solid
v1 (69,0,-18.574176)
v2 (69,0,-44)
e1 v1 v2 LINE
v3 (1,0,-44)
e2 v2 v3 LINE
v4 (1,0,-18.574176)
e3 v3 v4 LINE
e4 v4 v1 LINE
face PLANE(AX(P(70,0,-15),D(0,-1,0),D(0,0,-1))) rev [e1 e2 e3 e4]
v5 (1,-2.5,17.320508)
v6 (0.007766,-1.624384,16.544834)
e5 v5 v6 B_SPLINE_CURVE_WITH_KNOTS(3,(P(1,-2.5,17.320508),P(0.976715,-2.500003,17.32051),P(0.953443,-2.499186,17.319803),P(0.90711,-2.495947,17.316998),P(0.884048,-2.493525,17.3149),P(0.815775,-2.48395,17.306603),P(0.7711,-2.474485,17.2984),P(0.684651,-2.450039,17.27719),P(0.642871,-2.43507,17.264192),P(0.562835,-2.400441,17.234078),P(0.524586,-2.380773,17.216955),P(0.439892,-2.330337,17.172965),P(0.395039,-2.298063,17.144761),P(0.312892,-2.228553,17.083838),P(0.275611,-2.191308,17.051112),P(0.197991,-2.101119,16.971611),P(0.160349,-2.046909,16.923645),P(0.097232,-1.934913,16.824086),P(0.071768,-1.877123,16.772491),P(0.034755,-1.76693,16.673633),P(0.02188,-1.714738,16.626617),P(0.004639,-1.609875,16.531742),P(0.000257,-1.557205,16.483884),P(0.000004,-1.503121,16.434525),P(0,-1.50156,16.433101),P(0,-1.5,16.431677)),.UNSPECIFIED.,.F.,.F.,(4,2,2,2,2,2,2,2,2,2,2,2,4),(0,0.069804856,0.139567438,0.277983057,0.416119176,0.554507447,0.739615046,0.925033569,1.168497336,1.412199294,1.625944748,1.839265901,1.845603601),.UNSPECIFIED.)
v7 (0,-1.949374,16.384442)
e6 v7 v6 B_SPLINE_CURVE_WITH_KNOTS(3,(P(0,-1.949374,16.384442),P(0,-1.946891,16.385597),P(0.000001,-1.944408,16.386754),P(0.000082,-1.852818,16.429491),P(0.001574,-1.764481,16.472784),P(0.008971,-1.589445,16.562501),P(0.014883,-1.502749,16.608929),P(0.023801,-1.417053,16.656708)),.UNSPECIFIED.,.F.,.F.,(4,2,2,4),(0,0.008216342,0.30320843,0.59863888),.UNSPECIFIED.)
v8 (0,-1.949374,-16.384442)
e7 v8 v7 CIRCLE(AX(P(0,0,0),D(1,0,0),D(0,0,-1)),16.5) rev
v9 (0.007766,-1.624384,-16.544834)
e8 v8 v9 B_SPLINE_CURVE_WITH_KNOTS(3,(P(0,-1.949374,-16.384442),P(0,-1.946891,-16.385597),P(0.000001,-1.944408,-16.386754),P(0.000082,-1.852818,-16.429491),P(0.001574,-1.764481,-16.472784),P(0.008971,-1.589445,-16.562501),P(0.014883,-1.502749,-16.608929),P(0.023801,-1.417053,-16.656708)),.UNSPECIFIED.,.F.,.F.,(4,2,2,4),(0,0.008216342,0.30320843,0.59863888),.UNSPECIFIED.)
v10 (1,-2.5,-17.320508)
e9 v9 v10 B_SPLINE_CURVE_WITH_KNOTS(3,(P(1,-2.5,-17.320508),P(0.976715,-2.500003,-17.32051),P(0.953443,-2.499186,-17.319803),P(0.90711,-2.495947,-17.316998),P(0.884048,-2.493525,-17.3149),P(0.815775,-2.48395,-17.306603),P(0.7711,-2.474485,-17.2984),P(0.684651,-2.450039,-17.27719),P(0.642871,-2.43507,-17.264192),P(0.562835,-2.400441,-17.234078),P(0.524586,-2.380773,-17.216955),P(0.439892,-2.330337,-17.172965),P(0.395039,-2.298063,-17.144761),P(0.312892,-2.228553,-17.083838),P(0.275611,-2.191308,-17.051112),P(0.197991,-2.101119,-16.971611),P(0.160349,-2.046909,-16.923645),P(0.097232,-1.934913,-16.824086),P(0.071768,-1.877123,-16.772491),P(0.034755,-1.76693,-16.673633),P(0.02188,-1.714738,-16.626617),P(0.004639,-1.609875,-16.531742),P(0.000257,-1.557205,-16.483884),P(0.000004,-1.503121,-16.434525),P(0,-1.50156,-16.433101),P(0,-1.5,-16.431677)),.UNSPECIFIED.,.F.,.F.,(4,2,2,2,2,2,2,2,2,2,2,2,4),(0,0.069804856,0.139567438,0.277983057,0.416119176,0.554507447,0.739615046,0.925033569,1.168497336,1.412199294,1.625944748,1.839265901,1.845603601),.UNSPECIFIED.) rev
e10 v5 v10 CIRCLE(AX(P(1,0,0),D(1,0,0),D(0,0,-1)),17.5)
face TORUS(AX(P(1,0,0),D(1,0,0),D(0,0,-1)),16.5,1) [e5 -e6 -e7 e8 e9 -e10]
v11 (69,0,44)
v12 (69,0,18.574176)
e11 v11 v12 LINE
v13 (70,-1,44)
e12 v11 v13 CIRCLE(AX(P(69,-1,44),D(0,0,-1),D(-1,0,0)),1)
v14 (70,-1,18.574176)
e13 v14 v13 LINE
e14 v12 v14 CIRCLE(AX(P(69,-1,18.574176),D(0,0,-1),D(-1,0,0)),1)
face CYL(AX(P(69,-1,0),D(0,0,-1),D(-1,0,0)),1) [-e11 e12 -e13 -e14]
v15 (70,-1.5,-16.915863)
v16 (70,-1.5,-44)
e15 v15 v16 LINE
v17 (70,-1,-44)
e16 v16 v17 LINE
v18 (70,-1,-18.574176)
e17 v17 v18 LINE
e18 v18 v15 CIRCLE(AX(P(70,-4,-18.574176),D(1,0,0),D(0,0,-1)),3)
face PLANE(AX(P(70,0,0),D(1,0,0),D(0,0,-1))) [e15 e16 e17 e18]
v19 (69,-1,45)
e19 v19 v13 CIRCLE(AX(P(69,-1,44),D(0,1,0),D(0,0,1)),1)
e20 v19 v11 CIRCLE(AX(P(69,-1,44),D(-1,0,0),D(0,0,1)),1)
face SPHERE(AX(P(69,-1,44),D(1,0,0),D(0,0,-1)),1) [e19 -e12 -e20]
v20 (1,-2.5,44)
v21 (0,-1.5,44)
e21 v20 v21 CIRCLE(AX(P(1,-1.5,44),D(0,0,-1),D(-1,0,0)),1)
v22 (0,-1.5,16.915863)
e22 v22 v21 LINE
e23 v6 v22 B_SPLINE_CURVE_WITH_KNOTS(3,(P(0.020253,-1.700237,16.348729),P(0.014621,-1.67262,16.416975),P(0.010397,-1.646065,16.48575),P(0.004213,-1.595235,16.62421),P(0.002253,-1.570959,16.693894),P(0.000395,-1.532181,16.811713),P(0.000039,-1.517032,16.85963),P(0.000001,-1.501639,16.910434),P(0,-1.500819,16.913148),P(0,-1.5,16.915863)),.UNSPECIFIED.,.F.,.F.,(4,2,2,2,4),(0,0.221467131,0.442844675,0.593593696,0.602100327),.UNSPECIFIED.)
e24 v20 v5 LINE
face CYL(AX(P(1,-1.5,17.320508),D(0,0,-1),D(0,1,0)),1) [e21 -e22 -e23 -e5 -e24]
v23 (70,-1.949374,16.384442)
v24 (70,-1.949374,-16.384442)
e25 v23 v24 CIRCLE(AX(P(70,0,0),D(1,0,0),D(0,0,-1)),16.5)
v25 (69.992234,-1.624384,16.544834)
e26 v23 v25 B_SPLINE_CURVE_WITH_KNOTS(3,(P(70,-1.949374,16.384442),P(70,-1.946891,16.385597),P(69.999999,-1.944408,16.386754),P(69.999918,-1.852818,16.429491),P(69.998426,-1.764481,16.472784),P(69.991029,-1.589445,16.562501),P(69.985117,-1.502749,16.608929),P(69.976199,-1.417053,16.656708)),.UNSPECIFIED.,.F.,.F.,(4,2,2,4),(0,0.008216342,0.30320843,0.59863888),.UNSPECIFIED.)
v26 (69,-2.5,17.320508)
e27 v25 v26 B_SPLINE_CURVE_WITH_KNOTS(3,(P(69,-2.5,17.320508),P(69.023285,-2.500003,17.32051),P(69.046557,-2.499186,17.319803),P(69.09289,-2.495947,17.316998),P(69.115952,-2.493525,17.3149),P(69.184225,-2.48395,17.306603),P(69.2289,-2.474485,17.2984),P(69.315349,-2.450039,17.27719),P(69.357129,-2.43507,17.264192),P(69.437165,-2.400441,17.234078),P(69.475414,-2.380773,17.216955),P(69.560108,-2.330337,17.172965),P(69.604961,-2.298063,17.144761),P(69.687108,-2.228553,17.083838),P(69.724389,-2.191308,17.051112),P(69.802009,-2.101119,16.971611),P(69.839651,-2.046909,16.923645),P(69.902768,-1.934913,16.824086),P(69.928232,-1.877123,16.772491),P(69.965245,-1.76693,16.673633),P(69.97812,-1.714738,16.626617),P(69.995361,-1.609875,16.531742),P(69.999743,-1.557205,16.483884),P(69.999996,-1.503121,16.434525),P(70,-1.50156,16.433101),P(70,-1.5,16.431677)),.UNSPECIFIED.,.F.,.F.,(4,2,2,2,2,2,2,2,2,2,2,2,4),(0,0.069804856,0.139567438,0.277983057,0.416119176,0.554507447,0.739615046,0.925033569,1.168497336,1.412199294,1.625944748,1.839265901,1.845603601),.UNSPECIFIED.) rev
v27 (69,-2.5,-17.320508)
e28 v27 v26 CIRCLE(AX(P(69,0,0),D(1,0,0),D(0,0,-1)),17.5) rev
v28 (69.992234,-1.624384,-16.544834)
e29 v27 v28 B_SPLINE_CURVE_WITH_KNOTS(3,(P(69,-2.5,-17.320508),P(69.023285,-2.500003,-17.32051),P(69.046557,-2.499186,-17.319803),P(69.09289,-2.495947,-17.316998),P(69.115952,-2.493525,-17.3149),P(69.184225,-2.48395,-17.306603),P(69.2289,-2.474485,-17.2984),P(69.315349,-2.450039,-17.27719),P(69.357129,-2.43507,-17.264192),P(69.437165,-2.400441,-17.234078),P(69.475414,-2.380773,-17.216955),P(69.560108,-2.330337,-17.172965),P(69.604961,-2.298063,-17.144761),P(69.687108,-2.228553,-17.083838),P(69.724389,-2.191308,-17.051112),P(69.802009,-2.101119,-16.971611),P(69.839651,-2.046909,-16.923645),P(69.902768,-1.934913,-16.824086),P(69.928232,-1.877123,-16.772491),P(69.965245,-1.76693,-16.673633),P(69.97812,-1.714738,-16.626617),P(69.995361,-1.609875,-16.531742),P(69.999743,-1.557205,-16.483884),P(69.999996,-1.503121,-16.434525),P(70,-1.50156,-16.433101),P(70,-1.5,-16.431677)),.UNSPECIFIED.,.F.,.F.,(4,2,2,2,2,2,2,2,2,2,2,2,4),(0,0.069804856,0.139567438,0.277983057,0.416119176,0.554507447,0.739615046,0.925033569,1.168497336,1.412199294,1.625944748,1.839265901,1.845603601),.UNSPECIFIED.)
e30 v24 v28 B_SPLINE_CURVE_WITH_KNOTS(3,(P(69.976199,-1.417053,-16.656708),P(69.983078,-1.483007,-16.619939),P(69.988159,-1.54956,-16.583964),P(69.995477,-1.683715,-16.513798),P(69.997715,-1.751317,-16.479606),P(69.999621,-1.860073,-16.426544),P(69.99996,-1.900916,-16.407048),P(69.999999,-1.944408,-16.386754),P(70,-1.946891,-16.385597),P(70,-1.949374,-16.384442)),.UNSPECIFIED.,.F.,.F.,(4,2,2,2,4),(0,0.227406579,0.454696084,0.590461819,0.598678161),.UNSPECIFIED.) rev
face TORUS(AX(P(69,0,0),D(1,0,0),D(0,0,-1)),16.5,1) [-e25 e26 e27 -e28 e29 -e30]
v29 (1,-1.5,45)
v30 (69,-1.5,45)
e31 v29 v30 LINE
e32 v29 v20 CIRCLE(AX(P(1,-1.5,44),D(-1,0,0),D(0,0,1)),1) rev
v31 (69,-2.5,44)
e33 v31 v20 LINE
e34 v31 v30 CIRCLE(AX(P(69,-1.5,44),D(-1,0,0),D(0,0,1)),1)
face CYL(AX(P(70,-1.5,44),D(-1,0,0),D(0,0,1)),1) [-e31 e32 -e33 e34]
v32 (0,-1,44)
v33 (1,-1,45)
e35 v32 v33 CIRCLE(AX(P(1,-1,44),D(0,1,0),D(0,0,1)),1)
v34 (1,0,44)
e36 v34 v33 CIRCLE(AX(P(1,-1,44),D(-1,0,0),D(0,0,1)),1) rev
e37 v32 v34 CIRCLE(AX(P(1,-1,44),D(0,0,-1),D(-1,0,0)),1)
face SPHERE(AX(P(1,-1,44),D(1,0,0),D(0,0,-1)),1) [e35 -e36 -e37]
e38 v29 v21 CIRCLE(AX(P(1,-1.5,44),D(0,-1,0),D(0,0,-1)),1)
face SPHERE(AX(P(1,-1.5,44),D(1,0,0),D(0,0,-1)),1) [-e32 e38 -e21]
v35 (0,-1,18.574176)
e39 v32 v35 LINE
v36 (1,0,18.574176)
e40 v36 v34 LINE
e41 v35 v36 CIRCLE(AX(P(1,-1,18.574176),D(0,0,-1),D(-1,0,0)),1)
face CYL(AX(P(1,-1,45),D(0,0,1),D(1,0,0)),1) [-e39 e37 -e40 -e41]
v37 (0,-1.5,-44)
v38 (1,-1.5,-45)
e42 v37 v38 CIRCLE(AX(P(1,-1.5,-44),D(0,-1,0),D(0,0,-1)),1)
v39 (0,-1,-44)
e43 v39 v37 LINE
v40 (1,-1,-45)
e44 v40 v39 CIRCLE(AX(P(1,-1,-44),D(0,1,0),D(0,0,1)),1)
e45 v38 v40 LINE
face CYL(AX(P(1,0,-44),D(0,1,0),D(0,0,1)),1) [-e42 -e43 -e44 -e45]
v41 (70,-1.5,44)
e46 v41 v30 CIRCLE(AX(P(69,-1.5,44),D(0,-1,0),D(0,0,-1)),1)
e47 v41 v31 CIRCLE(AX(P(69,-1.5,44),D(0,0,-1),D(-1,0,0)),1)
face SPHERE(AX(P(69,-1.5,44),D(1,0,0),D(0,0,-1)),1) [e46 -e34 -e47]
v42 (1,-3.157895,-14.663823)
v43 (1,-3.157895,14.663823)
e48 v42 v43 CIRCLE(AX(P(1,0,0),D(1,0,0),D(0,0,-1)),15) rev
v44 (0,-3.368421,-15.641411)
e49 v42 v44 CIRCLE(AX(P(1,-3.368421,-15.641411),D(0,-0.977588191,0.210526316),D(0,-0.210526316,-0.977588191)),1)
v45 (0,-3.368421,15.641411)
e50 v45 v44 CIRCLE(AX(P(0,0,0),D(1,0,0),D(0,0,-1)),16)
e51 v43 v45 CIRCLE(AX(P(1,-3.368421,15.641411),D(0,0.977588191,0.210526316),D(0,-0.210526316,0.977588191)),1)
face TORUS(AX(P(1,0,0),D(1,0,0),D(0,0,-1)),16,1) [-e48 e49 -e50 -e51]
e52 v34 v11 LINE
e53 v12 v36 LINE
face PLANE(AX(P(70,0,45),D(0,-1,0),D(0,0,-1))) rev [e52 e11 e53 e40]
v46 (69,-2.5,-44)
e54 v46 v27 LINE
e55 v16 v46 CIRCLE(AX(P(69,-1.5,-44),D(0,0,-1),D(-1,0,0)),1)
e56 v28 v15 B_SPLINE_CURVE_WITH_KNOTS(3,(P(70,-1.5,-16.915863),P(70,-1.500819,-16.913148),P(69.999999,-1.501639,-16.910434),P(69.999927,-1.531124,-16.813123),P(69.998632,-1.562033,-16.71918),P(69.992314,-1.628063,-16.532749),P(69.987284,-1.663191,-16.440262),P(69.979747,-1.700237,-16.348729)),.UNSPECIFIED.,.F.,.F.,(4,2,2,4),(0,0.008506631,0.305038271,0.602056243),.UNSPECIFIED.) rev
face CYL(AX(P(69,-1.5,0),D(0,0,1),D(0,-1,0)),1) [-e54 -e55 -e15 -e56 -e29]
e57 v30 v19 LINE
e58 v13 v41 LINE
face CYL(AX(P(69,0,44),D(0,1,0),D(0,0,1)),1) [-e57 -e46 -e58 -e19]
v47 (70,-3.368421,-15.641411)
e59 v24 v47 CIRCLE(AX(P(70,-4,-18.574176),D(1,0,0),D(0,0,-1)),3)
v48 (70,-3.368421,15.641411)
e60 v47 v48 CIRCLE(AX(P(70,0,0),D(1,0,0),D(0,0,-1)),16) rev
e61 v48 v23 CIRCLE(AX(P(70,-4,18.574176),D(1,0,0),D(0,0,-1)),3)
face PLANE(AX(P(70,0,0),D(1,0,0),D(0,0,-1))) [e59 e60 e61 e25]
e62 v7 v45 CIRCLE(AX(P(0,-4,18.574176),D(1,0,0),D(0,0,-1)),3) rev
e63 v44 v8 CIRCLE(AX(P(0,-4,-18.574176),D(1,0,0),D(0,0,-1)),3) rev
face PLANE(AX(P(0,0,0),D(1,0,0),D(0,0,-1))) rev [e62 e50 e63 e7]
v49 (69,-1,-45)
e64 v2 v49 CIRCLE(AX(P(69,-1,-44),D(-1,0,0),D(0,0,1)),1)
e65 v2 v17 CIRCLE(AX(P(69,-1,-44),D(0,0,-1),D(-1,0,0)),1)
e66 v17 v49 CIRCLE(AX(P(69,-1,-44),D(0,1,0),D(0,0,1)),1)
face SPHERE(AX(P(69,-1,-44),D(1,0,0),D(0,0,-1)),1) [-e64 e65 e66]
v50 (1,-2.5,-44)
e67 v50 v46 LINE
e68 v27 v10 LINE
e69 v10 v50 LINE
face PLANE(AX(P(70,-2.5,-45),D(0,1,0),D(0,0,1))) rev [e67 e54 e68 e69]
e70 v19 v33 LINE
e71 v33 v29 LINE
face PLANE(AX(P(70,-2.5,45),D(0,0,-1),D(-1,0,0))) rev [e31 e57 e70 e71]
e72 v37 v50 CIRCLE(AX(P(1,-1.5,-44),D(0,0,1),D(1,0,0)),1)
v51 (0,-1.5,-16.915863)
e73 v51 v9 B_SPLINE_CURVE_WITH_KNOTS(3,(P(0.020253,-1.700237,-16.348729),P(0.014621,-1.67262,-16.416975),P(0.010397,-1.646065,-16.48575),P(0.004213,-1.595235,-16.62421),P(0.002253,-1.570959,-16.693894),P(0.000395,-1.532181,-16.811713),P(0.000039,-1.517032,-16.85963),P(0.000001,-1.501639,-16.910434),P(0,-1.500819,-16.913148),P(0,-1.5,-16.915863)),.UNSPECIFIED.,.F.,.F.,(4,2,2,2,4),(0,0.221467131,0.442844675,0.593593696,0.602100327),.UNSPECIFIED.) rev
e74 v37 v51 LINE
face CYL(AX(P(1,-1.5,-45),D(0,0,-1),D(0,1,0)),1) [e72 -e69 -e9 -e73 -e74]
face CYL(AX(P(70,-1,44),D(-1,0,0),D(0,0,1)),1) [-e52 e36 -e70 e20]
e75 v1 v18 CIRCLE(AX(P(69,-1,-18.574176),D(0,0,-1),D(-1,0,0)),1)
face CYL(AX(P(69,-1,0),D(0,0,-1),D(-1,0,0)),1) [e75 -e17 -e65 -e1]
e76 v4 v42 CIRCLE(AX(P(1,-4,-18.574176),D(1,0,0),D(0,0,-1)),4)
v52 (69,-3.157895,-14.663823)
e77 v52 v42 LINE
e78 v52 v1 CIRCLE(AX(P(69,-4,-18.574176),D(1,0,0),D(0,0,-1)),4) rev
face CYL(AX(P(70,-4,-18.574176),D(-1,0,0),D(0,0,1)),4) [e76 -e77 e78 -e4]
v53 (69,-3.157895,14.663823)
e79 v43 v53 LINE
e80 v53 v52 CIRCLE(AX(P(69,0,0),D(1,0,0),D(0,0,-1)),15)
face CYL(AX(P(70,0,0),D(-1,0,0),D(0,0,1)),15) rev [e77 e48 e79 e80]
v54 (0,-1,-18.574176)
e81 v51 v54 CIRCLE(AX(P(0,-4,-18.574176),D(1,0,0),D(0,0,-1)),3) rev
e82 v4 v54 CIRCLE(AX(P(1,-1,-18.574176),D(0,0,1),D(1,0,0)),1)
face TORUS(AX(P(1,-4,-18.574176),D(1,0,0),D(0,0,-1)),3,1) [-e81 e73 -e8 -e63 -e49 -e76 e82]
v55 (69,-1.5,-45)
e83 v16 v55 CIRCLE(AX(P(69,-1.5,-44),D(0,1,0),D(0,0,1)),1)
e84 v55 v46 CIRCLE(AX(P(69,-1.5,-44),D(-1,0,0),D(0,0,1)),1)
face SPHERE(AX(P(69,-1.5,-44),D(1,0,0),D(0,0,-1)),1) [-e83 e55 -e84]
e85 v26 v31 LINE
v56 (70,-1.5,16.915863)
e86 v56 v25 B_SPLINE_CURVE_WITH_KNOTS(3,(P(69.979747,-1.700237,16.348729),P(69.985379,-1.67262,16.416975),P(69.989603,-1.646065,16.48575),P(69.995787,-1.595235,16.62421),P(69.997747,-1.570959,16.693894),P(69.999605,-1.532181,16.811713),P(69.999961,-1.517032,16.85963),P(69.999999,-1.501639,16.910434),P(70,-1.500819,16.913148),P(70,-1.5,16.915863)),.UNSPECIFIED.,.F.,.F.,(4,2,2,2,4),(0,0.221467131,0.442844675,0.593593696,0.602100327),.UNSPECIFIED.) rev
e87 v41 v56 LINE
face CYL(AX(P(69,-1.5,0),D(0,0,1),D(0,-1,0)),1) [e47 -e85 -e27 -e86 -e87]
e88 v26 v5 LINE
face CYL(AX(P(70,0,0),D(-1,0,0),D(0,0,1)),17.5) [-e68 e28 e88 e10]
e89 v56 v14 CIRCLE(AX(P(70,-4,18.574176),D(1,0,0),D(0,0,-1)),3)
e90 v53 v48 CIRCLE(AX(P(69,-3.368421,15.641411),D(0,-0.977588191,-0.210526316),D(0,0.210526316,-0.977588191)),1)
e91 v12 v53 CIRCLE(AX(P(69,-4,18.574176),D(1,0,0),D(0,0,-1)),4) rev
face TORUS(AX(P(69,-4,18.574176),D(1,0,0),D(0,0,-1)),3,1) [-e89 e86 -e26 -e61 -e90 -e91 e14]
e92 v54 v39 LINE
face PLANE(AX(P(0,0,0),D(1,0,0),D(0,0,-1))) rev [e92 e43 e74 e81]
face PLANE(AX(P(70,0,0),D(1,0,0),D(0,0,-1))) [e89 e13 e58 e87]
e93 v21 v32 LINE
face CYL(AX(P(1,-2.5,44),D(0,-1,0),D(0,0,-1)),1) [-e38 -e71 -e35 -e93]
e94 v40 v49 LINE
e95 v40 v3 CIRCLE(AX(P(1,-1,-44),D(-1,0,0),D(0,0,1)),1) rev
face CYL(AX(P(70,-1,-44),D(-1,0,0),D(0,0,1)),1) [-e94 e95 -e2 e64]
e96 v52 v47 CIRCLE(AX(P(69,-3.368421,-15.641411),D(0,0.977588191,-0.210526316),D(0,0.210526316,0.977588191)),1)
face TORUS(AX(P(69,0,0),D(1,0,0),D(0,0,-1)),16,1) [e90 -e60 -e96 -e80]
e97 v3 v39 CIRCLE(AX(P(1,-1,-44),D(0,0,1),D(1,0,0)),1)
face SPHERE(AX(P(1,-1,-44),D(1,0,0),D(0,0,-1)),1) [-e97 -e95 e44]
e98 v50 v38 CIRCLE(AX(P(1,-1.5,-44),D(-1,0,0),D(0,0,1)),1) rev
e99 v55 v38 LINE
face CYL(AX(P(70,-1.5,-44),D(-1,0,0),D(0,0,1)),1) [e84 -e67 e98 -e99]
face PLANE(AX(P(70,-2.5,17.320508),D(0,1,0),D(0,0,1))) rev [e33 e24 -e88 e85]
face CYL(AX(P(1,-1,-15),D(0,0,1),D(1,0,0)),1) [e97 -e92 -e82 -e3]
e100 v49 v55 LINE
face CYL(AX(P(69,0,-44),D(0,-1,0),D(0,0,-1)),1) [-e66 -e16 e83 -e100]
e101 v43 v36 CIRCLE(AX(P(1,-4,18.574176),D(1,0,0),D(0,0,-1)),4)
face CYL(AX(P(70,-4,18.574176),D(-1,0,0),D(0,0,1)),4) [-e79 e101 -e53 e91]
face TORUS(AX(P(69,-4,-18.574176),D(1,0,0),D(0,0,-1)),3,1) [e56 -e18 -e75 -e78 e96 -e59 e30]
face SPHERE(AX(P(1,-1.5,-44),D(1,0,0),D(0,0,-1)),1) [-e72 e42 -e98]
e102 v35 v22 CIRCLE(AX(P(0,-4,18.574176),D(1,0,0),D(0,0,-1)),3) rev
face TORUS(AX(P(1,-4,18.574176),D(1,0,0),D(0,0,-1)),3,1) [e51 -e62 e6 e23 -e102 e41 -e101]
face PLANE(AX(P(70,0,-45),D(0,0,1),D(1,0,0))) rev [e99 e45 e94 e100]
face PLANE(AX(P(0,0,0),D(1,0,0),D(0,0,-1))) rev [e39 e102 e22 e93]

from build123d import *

# Parameters (mm, degrees)
BOSS_EXTRUDE1_DEPTH = 70
FILLET1_R           = 1
FILLET2_R           = 4
FILLET3_R           = 1


with BuildPart() as part:
    # Sketch1 → Boss-Extrude1 (new body)
    with BuildSketch(Plane(origin=(0, 0, 0), x_dir=(0, 0, -1), z_dir=(1, 0, 0))):
        with BuildLine():
            Line((-45, 0), (-15, 0))
            ThreePointArc((-15, 0), (0, -15), (15, 0))
            Line((15, 0), (45, 0))
            Line((45, 0), (45, -2.5))
            Line((45, -2.5), (17.320508076, -2.5))
            ThreePointArc((17.320508076, -2.5), (0, -17.5), (-17.320508076, -2.5))
            Line((-17.320508076, -2.5), (-45, -2.5))
            Line((-45, -2.5), (-45, 0))
        make_face()
    extrude(amount=BOSS_EXTRUDE1_DEPTH)

    # Fillet1
    fillet1_edges = [part.edges().sort_by_distance(p)[0] for p in [
        (35, 0, -45),
        (35, -2.5, -45),
        (35, -2.5, 45),
        (35, 0, 45),
    ]]
    fillet(fillet1_edges, radius=FILLET1_R)

    # Fillet2
    fillet2_edges = [part.edges().sort_by_distance(p)[0] for p in [
        (35, 0, -15),
        (35, 0, 15),
    ]]
    fillet(fillet2_edges, radius=FILLET2_R)

    # Fillet3
    # the kernel refuses this fillet: 1 mm, written as the material it takes off along each edge
    with BuildSketch(Plane(origin=(70, 0, 0), x_dir=(0, -0.0003007400627751114, -0.9999999547777063), z_dir=(0, 0.9999999547777063, -0.0003007400627751114))) as fillet3_piece_1_section:
        with BuildLine():
            CenterArc((17.5 - FILLET3_R, FILLET3_R), FILLET3_R, 270, 90)
            Line((17.5 - FILLET3_R, 0), (17.5, 0))
            Line((17.5, 0), (17.5, FILLET3_R))
        make_face()
    fillet3_piece_1 = revolve(axis=Axis((70, 0, 0), (-1, 0, 0)), revolution_arc=179.965537727, mode=Mode.PRIVATE)
    fillet3_piece_1 = split(fillet3_piece_1, bisect_by=Plane(origin=(70, -2.5, 0), z_dir=(0, -1, 0)), keep=Keep.TOP, mode=Mode.PRIVATE)
    add(fillet3_piece_1, mode=Mode.SUBTRACT)
    with BuildSketch(Plane(origin=(70, -2.5, -44), x_dir=(-1, 0, 0), z_dir=(0, 0, 1))) as fillet3_piece_2_section:
        with BuildLine():
            CenterArc((FILLET3_R, -FILLET3_R), FILLET3_R, 90, 90)
            Line((0, -FILLET3_R), (0, 0))
            Line((0, 0), (FILLET3_R, 0))
        make_face()
    fillet3_piece_2 = extrude(amount=29.179491924, mode=Mode.PRIVATE)
    fillet3_piece_2 = fillet3_piece_2 - Plane(origin=(70, 0, 0), x_dir=(0, -0.14285714285714307, -0.989743318610787), z_dir=(-1, 0, 0)) * Cylinder(17.5, 63, mode=Mode.PRIVATE)
    add(fillet3_piece_2, mode=Mode.SUBTRACT)
    with BuildSketch(Plane(origin=(0, -1, -45), x_dir=(0, 0, 1), z_dir=(0, -1, 0)), Plane(origin=(70, -1, -45), x_dir=(-1, 0, 0), z_dir=(0, -1, 0)), Plane(origin=(0, -1.5, 45), x_dir=(0, 0, -1), z_dir=(0, 1, 0)), Plane(origin=(70, -1.5, 45), x_dir=(-1, 0, 0), z_dir=(0, 1, 0))) as fillet3_piece_3:
        with BuildLine():
            CenterArc((FILLET3_R, -FILLET3_R), FILLET3_R, 90, 90)
            Line((0, -FILLET3_R), (0, 0))
            Line((0, 0), (FILLET3_R, 0))
        make_face()
    extrude(amount=0.5, mode=Mode.SUBTRACT)
    with BuildSketch(Plane(origin=(0, 0, -18.574175621), x_dir=(0, -1, 0), z_dir=(0, 0, -1)), Plane(origin=(70, 0, -18.574175621), x_dir=(-1, 0, 0), z_dir=(0, 0, -1)), Plane(origin=(0, 0, 44), x_dir=(0, -1, 0), z_dir=(0, 0, -1)), Plane(origin=(70, 0, 44), x_dir=(-1, 0, 0), z_dir=(0, 0, -1))) as fillet3_piece_4:
        with BuildLine():
            CenterArc((FILLET3_R, -FILLET3_R), FILLET3_R, 90, 90)
            Line((0, -FILLET3_R), (0, 0))
            Line((0, 0), (FILLET3_R, 0))
        make_face()
    extrude(amount=25.425824379, mode=Mode.SUBTRACT)
    with BuildSketch(Plane(origin=(0, -2.5, 14.820508076), x_dir=(0, 1, 0), z_dir=(0, 0, 1))) as fillet3_piece_5_section:
        with BuildLine():
            CenterArc((FILLET3_R, -FILLET3_R), FILLET3_R, 90, 90)
            Line((0, -FILLET3_R), (0, 0))
            Line((0, 0), (FILLET3_R, 0))
        make_face()
    fillet3_piece_5 = extrude(amount=29.179491924, mode=Mode.PRIVATE)
    fillet3_piece_5 = fillet3_piece_5 - Plane(origin=(0, 0, 0), x_dir=(0, -0.14285714285714307, -0.989743318610787), z_dir=(-1, 0, 0)) * Cylinder(17.5, 63, mode=Mode.PRIVATE)
    add(fillet3_piece_5, mode=Mode.SUBTRACT)
    with BuildSketch(Plane(origin=(0, -1, 44), x_dir=(0, 0, 1), z_dir=(0, -1, 0))) as fillet3_piece_6:
        with BuildLine():
            CenterArc((1 - FILLET3_R, -FILLET3_R), FILLET3_R, 0, 90)
            Line((1, -FILLET3_R), (1, 0))
            Line((1, 0), (1 - FILLET3_R, 0))
        make_face()
    revolve(axis=Axis((0, -1, 44), (-1, 0, 0)), revolution_arc=90, mode=Mode.SUBTRACT)
    with BuildSketch(Plane(origin=(0, -1.5, 44), x_dir=(0, -1, 0), z_dir=(0, 0, -1))) as fillet3_piece_7:
        with BuildLine():
            CenterArc((1 - FILLET3_R, -FILLET3_R), FILLET3_R, 0, 90)
            Line((1, -FILLET3_R), (1, 0))
            Line((1, 0), (1 - FILLET3_R, 0))
        make_face()
    revolve(axis=Axis((0, -1.5, 44), (-1, 0, 0)), revolution_arc=90, mode=Mode.SUBTRACT)
    with BuildSketch(Plane(origin=(0, -1, -44), x_dir=(0, 1, 0), z_dir=(0, 0, 1))) as fillet3_piece_8:
        with BuildLine():
            CenterArc((1 - FILLET3_R, -FILLET3_R), FILLET3_R, 0, 90)
            Line((1, -FILLET3_R), (1, 0))
            Line((1, 0), (1 - FILLET3_R, 0))
        make_face()
    revolve(axis=Axis((0, -1, -44), (-1, 0, 0)), revolution_arc=90, mode=Mode.SUBTRACT)
    with BuildSketch(Plane(origin=(0, -1.5, -44), x_dir=(0, 0, -1), z_dir=(0, 1, 0))) as fillet3_piece_9:
        with BuildLine():
            CenterArc((1 - FILLET3_R, -FILLET3_R), FILLET3_R, 0, 90)
            Line((1, -FILLET3_R), (1, 0))
            Line((1, 0), (1 - FILLET3_R, 0))
        make_face()
    revolve(axis=Axis((0, -1.5, -44), (-1, 0, 0)), revolution_arc=90, mode=Mode.SUBTRACT)
    with BuildSketch(Plane(origin=(70, -2.5, 14.820508076), x_dir=(-1, 0, 0), z_dir=(0, 0, 1))) as fillet3_piece_10_section:
        with BuildLine():
            CenterArc((FILLET3_R, -FILLET3_R), FILLET3_R, 90, 90)
            Line((0, -FILLET3_R), (0, 0))
            Line((0, 0), (FILLET3_R, 0))
        make_face()
    fillet3_piece_10 = extrude(amount=29.179491924, mode=Mode.PRIVATE)
    fillet3_piece_10 = fillet3_piece_10 - Plane(origin=(70, 0, 0), x_dir=(0, -0.14285714285714307, -0.989743318610787), z_dir=(-1, 0, 0)) * Cylinder(17.5, 63, mode=Mode.PRIVATE)
    add(fillet3_piece_10, mode=Mode.SUBTRACT)
    with BuildSketch(Plane(origin=(70, -1, 44), x_dir=(0, 0, 1), z_dir=(0, -1, 0))) as fillet3_piece_11:
        with BuildLine():
            CenterArc((1 - FILLET3_R, FILLET3_R), FILLET3_R, 270, 90)
            Line((1 - FILLET3_R, 0), (1, 0))
            Line((1, 0), (1, FILLET3_R))
        make_face()
    revolve(axis=Axis((70, -1, 44), (-1, 0, 0)), revolution_arc=90, mode=Mode.SUBTRACT)
    with BuildSketch(Plane(origin=(70, -1.5, 44), x_dir=(0, -1, 0), z_dir=(0, 0, -1))) as fillet3_piece_12:
        with BuildLine():
            CenterArc((1 - FILLET3_R, FILLET3_R), FILLET3_R, 270, 90)
            Line((1 - FILLET3_R, 0), (1, 0))
            Line((1, 0), (1, FILLET3_R))
        make_face()
    revolve(axis=Axis((70, -1.5, 44), (-1, 0, 0)), revolution_arc=90, mode=Mode.SUBTRACT)
    with BuildSketch(Plane(origin=(70, -1, -44), x_dir=(0, 1, 0), z_dir=(0, 0, 1))) as fillet3_piece_13:
        with BuildLine():
            CenterArc((1 - FILLET3_R, FILLET3_R), FILLET3_R, 270, 90)
            Line((1 - FILLET3_R, 0), (1, 0))
            Line((1, 0), (1, FILLET3_R))
        make_face()
    revolve(axis=Axis((70, -1, -44), (-1, 0, 0)), revolution_arc=90, mode=Mode.SUBTRACT)
    with BuildSketch(Plane(origin=(70, -1.5, -44), x_dir=(0, 0, -1), z_dir=(0, 1, 0))) as fillet3_piece_14:
        with BuildLine():
            CenterArc((1 - FILLET3_R, FILLET3_R), FILLET3_R, 270, 90)
            Line((1 - FILLET3_R, 0), (1, 0))
            Line((1, 0), (1, FILLET3_R))
        make_face()
    revolve(axis=Axis((70, -1.5, -44), (-1, 0, 0)), revolution_arc=90, mode=Mode.SUBTRACT)
    with BuildSketch(Plane(origin=(0, 0, 0), x_dir=(0, -0.21052631578947376, 0.9775881905793005), z_dir=(0, 0.9775881905793005, 0.21052631578947376))) as fillet3_piece_15:
        with BuildLine():
            CenterArc((15 + FILLET3_R, FILLET3_R), FILLET3_R, 180, 90)
            Line((15, FILLET3_R), (15, 0))
            Line((15, 0), (15 + FILLET3_R, 0))
        make_face()
    revolve(axis=Axis((0, 0, 0), (1, 0, 0)), revolution_arc=155.693605062, mode=Mode.SUBTRACT)
    with BuildSketch(Plane(origin=(70, 0, 0), x_dir=(0, -0.21052631578947376, 0.9775881905793005), z_dir=(0, 0.9775881905793005, 0.21052631578947376))) as fillet3_piece_16:
        with BuildLine():
            CenterArc((15 + FILLET3_R, -FILLET3_R), FILLET3_R, 90, 90)
            Line((15 + FILLET3_R, 0), (15, 0))
            Line((15, 0), (15, -FILLET3_R))
        make_face()
    revolve(axis=Axis((70, 0, 0), (1, 0, 0)), revolution_arc=155.693605062, mode=Mode.SUBTRACT)
    with BuildSketch(Plane(origin=(0, -4, 18.574175621), x_dir=(0, 1, 0), z_dir=(0, 0, 1))) as fillet3_piece_17:
        with BuildLine():
            CenterArc((4 - FILLET3_R, -FILLET3_R), FILLET3_R, 0, 90)
            Line((4, -FILLET3_R), (4, 0))
            Line((4, 0), (4 - FILLET3_R, 0))
        make_face()
    revolve(axis=Axis((0, -4, 18.574175621), (-1, 0, 0)), revolution_arc=77.846802531, mode=Mode.SUBTRACT)
    with BuildSketch(Plane(origin=(0, -4, -18.574175621), x_dir=(0, 0.21052631578947345, 0.9775881905793007), z_dir=(0, -0.9775881905793007, 0.21052631578947345))) as fillet3_piece_18:
        with BuildLine():
            CenterArc((4 - FILLET3_R, -FILLET3_R), FILLET3_R, 0, 90)
            Line((4, -FILLET3_R), (4, 0))
            Line((4, 0), (4 - FILLET3_R, 0))
        make_face()
    revolve(axis=Axis((0, -4, -18.574175621), (-1, 0, 0)), revolution_arc=77.846802531, mode=Mode.SUBTRACT)
    with BuildSketch(Plane(origin=(70, -4, 18.574175621), x_dir=(0, 1, 0), z_dir=(0, 0, 1))) as fillet3_piece_19:
        with BuildLine():
            CenterArc((4 - FILLET3_R, FILLET3_R), FILLET3_R, 270, 90)
            Line((4 - FILLET3_R, 0), (4, 0))
            Line((4, 0), (4, FILLET3_R))
        make_face()
    revolve(axis=Axis((70, -4, 18.574175621), (-1, 0, 0)), revolution_arc=77.846802531, mode=Mode.SUBTRACT)
    with BuildSketch(Plane(origin=(70, -4, -18.574175621), x_dir=(0, 0.21052631578947345, 0.9775881905793007), z_dir=(0, -0.9775881905793007, 0.21052631578947345))) as fillet3_piece_20:
        with BuildLine():
            CenterArc((4 - FILLET3_R, FILLET3_R), FILLET3_R, 270, 90)
            Line((4 - FILLET3_R, 0), (4, 0))
            Line((4, 0), (4, FILLET3_R))
        make_face()
    revolve(axis=Axis((70, -4, -18.574175621), (-1, 0, 0)), revolution_arc=77.846802531, mode=Mode.SUBTRACT)
    with BuildSketch(Plane(origin=(0, -2.5, -44), x_dir=(0, 1, 0), z_dir=(0, 0, 1))) as fillet3_piece_21_section:
        with BuildLine():
            CenterArc((FILLET3_R, -FILLET3_R), FILLET3_R, 90, 90)
            Line((0, -FILLET3_R), (0, 0))
            Line((0, 0), (FILLET3_R, 0))
        make_face()
    fillet3_piece_21 = extrude(amount=29.179491924, mode=Mode.PRIVATE)
    fillet3_piece_21 = fillet3_piece_21 - Plane(origin=(0, 0, 0), x_dir=(0, -0.14285714285714307, -0.989743318610787), z_dir=(-1, 0, 0)) * Cylinder(17.5, 63, mode=Mode.PRIVATE)
    add(fillet3_piece_21, mode=Mode.SUBTRACT)
    with BuildSketch(Plane(origin=(0, 0, 0), x_dir=(0, -0.0003007400627751114, -0.9999999547777063), z_dir=(0, 0.9999999547777063, -0.0003007400627751114))) as fillet3_piece_22_section:
        with BuildLine():
            CenterArc((17.5 - FILLET3_R, -FILLET3_R), FILLET3_R, 0, 90)
            Line((17.5, -FILLET3_R), (17.5, 0))
            Line((17.5, 0), (17.5 - FILLET3_R, 0))
        make_face()
    fillet3_piece_22 = revolve(axis=Axis((0, 0, 0), (-1, 0, 0)), revolution_arc=179.965537727, mode=Mode.PRIVATE)
    fillet3_piece_22 = split(fillet3_piece_22, bisect_by=Plane(origin=(0, -2.5, 0), z_dir=(0, -1, 0)), keep=Keep.TOP, mode=Mode.PRIVATE)
    add(fillet3_piece_22, mode=Mode.SUBTRACT)
    with BuildSketch(Plane(origin=(70, 0, 0), x_dir=(0, -0.0003007400627751114, -0.9999999547777063), z_dir=(0, 0.9999999547777063, -0.0003007400627751114))) as fillet3_piece_23a_section:
        with BuildLine():
            CenterArc((17.5 - FILLET3_R, FILLET3_R), FILLET3_R, 270, 90)
            Line((17.5 - FILLET3_R, 0), (17.5, 0))
            Line((17.5, 0), (17.5, FILLET3_R))
        make_face()
    fillet3_piece_23a = revolve(axis=Axis((70, 0, 0), (-1, 0, 0)), revolution_arc=179.965537727, mode=Mode.PRIVATE)
    fillet3_piece_23a = fillet3_piece_23a & Plane(origin=(70, -4, -18.574175621), x_dir=(0, 0.21052631578947353, 0.9775881905793006), z_dir=(1, 0, 0)) * Cylinder(4, 70, mode=Mode.PRIVATE)
    fillet3_piece_23a = split(fillet3_piece_23a, bisect_by=Plane(origin=(70, -2.5, 0), z_dir=(0, 1, 0)), keep=Keep.TOP, mode=Mode.PRIVATE)
    with BuildSketch(Plane(origin=(70, -2.5, -44), x_dir=(-1, 0, 0), z_dir=(0, 0, 1))) as fillet3_piece_23b_section:
        with BuildLine():
            CenterArc((FILLET3_R, -FILLET3_R), FILLET3_R, 90, 90)
            Line((0, -FILLET3_R), (0, 0))
            Line((0, 0), (FILLET3_R, 0))
        make_face()
    fillet3_piece_23b = extrude(amount=29.179491924, mode=Mode.PRIVATE)
    fillet3_piece_23b = fillet3_piece_23b & Plane(origin=(70, -4, -18.574175621), x_dir=(0, 0.21052631578947353, 0.9775881905793006), z_dir=(1, 0, 0)) * Cylinder(4, 63, mode=Mode.PRIVATE)
    fillet3_piece_23b = fillet3_piece_23b & Plane(origin=(70, 0, 0), x_dir=(0, -0.14285714285714307, -0.989743318610787), z_dir=(-1, 0, 0)) * Cylinder(17.5, 63, mode=Mode.PRIVATE)
    fillet3_piece_23 = fillet3_piece_23a & fillet3_piece_23b
    add(fillet3_piece_23, mode=Mode.SUBTRACT)
    with BuildSketch(Plane(origin=(70, -2.5, 14.820508076), x_dir=(-1, 0, 0), z_dir=(0, 0, 1))) as fillet3_piece_24a_section:
        with BuildLine():
            CenterArc((FILLET3_R, -FILLET3_R), FILLET3_R, 90, 90)
            Line((0, -FILLET3_R), (0, 0))
            Line((0, 0), (FILLET3_R, 0))
        make_face()
    fillet3_piece_24a = extrude(amount=29.179491924, mode=Mode.PRIVATE)
    fillet3_piece_24a = fillet3_piece_24a & Plane(origin=(70, -4, 18.574175621), x_dir=(0, 1, 0), z_dir=(1, 0, 0)) * Cylinder(4, 63, mode=Mode.PRIVATE)
    fillet3_piece_24a = fillet3_piece_24a & Plane(origin=(70, 0, 0), x_dir=(0, -0.14285714285714307, -0.989743318610787), z_dir=(-1, 0, 0)) * Cylinder(17.5, 63, mode=Mode.PRIVATE)
    with BuildSketch(Plane(origin=(70, 0, 0), x_dir=(0, -0.0003007400627751114, -0.9999999547777063), z_dir=(0, 0.9999999547777063, -0.0003007400627751114))) as fillet3_piece_24b_section:
        with BuildLine():
            CenterArc((17.5 - FILLET3_R, FILLET3_R), FILLET3_R, 270, 90)
            Line((17.5 - FILLET3_R, 0), (17.5, 0))
            Line((17.5, 0), (17.5, FILLET3_R))
        make_face()
    fillet3_piece_24b = revolve(axis=Axis((70, 0, 0), (-1, 0, 0)), revolution_arc=179.965537727, mode=Mode.PRIVATE)
    fillet3_piece_24b = fillet3_piece_24b & Plane(origin=(70, -4, 18.574175621), x_dir=(0, 1, 0), z_dir=(1, 0, 0)) * Cylinder(4, 70, mode=Mode.PRIVATE)
    fillet3_piece_24b = split(fillet3_piece_24b, bisect_by=Plane(origin=(70, -2.5, 0), z_dir=(0, 1, 0)), keep=Keep.TOP, mode=Mode.PRIVATE)
    fillet3_piece_24 = fillet3_piece_24a & fillet3_piece_24b
    add(fillet3_piece_24, mode=Mode.SUBTRACT)
    with BuildSketch(Plane(origin=(0, -2.5, 14.820508076), x_dir=(0, 1, 0), z_dir=(0, 0, 1))) as fillet3_piece_25a_section:
        with BuildLine():
            CenterArc((FILLET3_R, -FILLET3_R), FILLET3_R, 90, 90)
            Line((0, -FILLET3_R), (0, 0))
            Line((0, 0), (FILLET3_R, 0))
        make_face()
    fillet3_piece_25a = extrude(amount=29.179491924, mode=Mode.PRIVATE)
    fillet3_piece_25a = fillet3_piece_25a & Plane(origin=(0, -4, 18.574175621), x_dir=(0, 1, 0), z_dir=(1, 0, 0)) * Cylinder(4, 63, mode=Mode.PRIVATE)
    fillet3_piece_25a = fillet3_piece_25a & Plane(origin=(0, 0, 0), x_dir=(0, -0.14285714285714307, -0.989743318610787), z_dir=(-1, 0, 0)) * Cylinder(17.5, 63, mode=Mode.PRIVATE)
    with BuildSketch(Plane(origin=(0, 0, 0), x_dir=(0, -0.0003007400627751114, -0.9999999547777063), z_dir=(0, 0.9999999547777063, -0.0003007400627751114))) as fillet3_piece_25b_section:
        with BuildLine():
            CenterArc((17.5 - FILLET3_R, -FILLET3_R), FILLET3_R, 0, 90)
            Line((17.5, -FILLET3_R), (17.5, 0))
            Line((17.5, 0), (17.5 - FILLET3_R, 0))
        make_face()
    fillet3_piece_25b = revolve(axis=Axis((0, 0, 0), (-1, 0, 0)), revolution_arc=179.965537727, mode=Mode.PRIVATE)
    fillet3_piece_25b = fillet3_piece_25b & Plane(origin=(0, -4, 18.574175621), x_dir=(0, 1, 0), z_dir=(1, 0, 0)) * Cylinder(4, 70, mode=Mode.PRIVATE)
    fillet3_piece_25b = split(fillet3_piece_25b, bisect_by=Plane(origin=(0, -2.5, 0), z_dir=(0, 1, 0)), keep=Keep.TOP, mode=Mode.PRIVATE)
    fillet3_piece_25 = fillet3_piece_25a & fillet3_piece_25b
    add(fillet3_piece_25, mode=Mode.SUBTRACT)
    with BuildSketch(Plane(origin=(0, 0, 0), x_dir=(0, -0.0003007400627751114, -0.9999999547777063), z_dir=(0, 0.9999999547777063, -0.0003007400627751114))) as fillet3_piece_26a_section:
        with BuildLine():
            CenterArc((17.5 - FILLET3_R, -FILLET3_R), FILLET3_R, 0, 90)
            Line((17.5, -FILLET3_R), (17.5, 0))
            Line((17.5, 0), (17.5 - FILLET3_R, 0))
        make_face()
    fillet3_piece_26a = revolve(axis=Axis((0, 0, 0), (-1, 0, 0)), revolution_arc=179.965537727, mode=Mode.PRIVATE)
    fillet3_piece_26a = fillet3_piece_26a & Plane(origin=(0, -4, -18.574175621), x_dir=(0, 0.21052631578947353, 0.9775881905793006), z_dir=(1, 0, 0)) * Cylinder(4, 70, mode=Mode.PRIVATE)
    fillet3_piece_26a = split(fillet3_piece_26a, bisect_by=Plane(origin=(0, -2.5, 0), z_dir=(0, 1, 0)), keep=Keep.TOP, mode=Mode.PRIVATE)
    with BuildSketch(Plane(origin=(0, -2.5, -44), x_dir=(0, 1, 0), z_dir=(0, 0, 1))) as fillet3_piece_26b_section:
        with BuildLine():
            CenterArc((FILLET3_R, -FILLET3_R), FILLET3_R, 90, 90)
            Line((0, -FILLET3_R), (0, 0))
            Line((0, 0), (FILLET3_R, 0))
        make_face()
    fillet3_piece_26b = extrude(amount=29.179491924, mode=Mode.PRIVATE)
    fillet3_piece_26b = fillet3_piece_26b & Plane(origin=(0, -4, -18.574175621), x_dir=(0, 0.21052631578947353, 0.9775881905793006), z_dir=(1, 0, 0)) * Cylinder(4, 63, mode=Mode.PRIVATE)
    fillet3_piece_26b = fillet3_piece_26b & Plane(origin=(0, 0, 0), x_dir=(0, -0.14285714285714307, -0.989743318610787), z_dir=(-1, 0, 0)) * Cylinder(17.5, 63, mode=Mode.PRIVATE)
    fillet3_piece_26 = fillet3_piece_26a & fillet3_piece_26b
    add(fillet3_piece_26, mode=Mode.SUBTRACT)


solid = part.part
